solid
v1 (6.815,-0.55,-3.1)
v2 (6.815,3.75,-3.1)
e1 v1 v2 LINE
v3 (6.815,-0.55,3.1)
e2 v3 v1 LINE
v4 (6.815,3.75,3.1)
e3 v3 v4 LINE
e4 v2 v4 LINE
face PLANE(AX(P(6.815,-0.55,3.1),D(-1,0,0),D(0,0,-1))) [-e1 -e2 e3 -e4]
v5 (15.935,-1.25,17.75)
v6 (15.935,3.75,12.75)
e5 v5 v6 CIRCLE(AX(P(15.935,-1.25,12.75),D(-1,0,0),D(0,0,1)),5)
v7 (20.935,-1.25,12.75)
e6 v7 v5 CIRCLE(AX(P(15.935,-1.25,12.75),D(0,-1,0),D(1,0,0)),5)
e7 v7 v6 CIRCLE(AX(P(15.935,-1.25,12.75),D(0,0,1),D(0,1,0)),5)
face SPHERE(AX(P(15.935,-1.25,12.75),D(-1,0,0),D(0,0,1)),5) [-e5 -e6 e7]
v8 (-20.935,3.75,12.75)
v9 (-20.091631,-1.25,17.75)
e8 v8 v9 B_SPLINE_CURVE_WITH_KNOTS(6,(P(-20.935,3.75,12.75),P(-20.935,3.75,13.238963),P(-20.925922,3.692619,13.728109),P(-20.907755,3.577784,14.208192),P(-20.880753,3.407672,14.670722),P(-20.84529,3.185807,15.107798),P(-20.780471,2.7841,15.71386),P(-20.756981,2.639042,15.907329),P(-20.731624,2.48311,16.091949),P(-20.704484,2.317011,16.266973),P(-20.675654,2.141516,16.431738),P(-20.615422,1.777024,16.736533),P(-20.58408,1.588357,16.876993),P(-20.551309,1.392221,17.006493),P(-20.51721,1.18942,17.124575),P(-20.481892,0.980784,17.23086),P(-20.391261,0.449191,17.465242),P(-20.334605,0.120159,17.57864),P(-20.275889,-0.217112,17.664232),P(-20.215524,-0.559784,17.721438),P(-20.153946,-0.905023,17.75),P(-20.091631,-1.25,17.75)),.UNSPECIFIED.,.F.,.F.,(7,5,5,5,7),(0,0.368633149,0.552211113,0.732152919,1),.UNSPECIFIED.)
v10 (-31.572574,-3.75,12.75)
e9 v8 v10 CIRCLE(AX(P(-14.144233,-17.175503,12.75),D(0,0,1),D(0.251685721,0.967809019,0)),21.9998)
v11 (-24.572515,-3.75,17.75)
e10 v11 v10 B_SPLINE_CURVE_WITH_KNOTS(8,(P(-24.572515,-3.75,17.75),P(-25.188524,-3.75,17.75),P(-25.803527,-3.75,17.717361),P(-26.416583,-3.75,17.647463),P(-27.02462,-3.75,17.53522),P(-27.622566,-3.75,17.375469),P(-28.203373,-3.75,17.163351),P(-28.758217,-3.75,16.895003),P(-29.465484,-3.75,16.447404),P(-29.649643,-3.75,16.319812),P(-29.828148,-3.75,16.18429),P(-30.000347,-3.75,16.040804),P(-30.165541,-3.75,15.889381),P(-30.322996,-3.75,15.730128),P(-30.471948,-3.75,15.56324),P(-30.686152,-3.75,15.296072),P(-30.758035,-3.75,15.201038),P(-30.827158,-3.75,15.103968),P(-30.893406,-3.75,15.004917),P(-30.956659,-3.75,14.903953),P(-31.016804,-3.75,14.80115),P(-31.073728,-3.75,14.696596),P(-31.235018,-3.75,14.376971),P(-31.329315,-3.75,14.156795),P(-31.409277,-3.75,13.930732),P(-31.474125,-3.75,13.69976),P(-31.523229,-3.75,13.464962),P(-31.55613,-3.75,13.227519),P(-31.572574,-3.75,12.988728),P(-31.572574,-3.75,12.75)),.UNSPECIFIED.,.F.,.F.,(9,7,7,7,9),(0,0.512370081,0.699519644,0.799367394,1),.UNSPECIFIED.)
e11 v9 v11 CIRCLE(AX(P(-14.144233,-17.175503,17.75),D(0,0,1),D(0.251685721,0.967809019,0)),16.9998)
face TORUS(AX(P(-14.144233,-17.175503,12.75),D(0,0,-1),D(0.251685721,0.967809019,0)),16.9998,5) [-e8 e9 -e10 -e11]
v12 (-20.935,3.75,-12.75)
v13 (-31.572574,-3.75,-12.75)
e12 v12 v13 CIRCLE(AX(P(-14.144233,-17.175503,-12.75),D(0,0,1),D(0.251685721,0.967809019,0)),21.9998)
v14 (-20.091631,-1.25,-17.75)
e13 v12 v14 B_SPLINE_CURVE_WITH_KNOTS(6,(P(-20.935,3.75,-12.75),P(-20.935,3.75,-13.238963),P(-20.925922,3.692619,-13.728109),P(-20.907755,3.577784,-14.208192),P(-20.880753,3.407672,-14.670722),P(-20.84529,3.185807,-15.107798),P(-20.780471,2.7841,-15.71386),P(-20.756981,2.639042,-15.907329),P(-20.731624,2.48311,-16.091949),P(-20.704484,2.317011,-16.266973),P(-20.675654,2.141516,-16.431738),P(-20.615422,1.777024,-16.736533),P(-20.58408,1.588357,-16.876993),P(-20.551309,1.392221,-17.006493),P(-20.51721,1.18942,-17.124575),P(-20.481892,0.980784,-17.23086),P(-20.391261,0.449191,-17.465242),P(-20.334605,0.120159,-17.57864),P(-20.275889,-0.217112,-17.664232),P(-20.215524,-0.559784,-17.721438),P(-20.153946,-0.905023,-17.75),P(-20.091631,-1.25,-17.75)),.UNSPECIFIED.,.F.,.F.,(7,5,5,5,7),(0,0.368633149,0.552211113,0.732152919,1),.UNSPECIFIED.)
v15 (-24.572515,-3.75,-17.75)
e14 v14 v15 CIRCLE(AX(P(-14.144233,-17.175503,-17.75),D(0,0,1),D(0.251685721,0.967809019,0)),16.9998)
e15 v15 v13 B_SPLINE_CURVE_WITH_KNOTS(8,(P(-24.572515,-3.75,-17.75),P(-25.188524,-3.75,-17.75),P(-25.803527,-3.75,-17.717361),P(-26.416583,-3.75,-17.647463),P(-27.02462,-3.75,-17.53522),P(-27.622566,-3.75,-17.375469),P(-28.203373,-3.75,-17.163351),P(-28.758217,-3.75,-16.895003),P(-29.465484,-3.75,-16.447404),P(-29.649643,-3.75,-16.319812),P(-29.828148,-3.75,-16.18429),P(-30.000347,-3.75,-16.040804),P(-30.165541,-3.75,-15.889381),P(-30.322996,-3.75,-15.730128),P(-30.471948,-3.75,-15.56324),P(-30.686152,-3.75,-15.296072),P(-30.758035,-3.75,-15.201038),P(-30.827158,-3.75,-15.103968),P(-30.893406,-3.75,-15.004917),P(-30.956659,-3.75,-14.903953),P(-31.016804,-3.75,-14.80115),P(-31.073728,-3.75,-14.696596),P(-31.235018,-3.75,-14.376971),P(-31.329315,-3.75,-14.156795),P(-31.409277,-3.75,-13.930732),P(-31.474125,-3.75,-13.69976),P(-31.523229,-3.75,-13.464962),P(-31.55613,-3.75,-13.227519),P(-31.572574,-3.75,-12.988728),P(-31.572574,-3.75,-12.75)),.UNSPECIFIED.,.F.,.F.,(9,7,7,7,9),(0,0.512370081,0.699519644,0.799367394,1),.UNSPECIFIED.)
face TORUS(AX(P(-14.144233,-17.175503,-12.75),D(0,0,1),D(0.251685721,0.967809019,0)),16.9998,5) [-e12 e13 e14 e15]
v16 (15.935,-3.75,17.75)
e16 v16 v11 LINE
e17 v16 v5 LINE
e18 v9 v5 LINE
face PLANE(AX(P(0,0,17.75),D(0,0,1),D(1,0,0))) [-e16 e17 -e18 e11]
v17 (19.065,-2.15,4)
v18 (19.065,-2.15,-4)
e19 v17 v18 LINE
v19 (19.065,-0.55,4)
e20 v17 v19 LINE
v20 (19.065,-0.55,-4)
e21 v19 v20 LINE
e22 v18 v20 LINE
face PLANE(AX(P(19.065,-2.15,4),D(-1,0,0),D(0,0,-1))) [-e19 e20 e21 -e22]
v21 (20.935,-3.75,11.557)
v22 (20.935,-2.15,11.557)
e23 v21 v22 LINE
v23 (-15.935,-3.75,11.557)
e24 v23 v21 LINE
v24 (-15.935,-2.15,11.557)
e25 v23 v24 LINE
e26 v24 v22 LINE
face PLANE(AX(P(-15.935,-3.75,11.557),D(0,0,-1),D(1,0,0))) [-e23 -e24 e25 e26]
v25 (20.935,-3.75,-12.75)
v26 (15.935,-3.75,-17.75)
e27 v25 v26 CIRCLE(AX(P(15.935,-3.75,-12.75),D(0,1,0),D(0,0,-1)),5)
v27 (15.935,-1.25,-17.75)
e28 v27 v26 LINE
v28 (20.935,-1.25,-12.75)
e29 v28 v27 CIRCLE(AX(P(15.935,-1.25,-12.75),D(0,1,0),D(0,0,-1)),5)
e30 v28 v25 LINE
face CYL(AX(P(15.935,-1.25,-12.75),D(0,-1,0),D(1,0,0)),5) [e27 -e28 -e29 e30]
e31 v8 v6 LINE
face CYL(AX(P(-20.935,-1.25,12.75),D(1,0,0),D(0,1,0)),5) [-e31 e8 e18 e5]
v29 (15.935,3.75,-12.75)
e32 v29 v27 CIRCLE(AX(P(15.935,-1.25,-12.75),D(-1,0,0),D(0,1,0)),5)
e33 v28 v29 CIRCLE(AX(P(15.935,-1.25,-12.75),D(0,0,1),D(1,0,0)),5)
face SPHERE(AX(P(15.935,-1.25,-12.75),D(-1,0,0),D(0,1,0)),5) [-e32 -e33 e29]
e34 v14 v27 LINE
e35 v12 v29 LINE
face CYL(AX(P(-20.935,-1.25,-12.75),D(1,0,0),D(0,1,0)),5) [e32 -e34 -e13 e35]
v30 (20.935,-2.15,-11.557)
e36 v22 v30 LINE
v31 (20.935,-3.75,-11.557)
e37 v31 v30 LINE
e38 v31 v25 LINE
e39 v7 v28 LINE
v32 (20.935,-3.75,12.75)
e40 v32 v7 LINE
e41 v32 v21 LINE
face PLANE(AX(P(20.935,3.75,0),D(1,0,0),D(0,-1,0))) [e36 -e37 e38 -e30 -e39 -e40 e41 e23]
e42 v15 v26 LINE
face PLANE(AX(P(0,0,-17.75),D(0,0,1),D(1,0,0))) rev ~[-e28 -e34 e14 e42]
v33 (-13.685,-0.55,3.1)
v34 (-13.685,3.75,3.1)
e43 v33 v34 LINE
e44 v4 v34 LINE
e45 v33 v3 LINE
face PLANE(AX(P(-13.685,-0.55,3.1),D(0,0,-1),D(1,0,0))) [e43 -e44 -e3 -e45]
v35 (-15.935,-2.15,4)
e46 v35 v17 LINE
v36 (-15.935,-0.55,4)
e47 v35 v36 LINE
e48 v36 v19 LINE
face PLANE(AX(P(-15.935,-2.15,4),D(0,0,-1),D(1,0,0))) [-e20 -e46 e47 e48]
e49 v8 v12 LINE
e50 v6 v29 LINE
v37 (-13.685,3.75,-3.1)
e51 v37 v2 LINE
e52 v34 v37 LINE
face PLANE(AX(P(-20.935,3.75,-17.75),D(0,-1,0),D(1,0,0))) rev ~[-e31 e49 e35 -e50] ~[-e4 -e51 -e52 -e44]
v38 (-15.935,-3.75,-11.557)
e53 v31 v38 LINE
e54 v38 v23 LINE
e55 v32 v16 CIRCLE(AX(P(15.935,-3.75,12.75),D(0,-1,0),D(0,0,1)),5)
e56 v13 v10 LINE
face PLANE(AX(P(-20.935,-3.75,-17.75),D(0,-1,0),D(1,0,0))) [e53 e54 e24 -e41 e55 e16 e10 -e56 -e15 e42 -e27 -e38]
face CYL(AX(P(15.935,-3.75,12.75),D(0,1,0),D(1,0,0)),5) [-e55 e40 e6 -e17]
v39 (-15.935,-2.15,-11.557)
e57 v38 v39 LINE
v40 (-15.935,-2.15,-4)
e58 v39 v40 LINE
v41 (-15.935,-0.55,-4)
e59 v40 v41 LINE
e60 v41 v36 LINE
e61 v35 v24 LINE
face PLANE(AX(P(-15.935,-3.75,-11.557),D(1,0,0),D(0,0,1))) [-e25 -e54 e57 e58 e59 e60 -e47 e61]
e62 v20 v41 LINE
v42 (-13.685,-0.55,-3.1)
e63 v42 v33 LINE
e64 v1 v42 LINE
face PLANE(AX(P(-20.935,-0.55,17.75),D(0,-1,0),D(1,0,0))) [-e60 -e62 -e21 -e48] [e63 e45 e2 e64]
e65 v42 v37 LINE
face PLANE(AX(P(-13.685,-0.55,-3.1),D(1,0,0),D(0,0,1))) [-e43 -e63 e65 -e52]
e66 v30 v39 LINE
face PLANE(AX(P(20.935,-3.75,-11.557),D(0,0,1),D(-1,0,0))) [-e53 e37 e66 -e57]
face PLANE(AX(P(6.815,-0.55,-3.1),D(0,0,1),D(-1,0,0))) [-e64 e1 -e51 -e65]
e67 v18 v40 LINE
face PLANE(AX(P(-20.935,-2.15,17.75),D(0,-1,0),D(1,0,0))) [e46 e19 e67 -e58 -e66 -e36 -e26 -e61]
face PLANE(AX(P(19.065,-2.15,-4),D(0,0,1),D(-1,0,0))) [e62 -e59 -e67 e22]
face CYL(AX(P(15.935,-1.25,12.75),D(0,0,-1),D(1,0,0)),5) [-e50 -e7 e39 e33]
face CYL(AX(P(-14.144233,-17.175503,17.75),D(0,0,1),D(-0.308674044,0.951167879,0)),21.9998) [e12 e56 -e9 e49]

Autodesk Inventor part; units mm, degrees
ref_plane "YZ Plane" through (0, 0, 0) normal (1, 0, 0) x (0, 1, 0)
ref_plane "XZ Plane" through (0, 0, 0) normal (0, 1, 0) x (-1, 0, 0)
ref_plane "XY Plane" through (0, 0, 0) normal (0, 0, 1) x (1, 0, 0)
sketch "Sketch1" plane through (0, 0, 0) normal (0, 0, 1) x (1, 0, 0)
  line L0 (-20.935, 3.75) -> (20.935, 3.75)
  line L1 (20.935, 3.75) -> (20.935, -3.75)
  line L2 (20.935, -3.75) -> (-20.935, -3.75)
  line L3 (-20.935, -3.75) -> (-20.935, 3.75)
  line L4 (-20.935, 3.75) -> (20.935, -3.75) construction
  line L5 (20.935, 3.75) -> (-20.935, -3.75) construction
  point P0 (0, 0)
  dimension "d0" = 41.87
  dimension "d1" = 7.5
extrude "Extrusion1" add sketch "Sketch1" along normal mid plane 35.5
sketch "Sketch2" plane through (-20.935, -3.75, 17.75) normal (0, -1, 0) x (1, 0, 0)
  line L0 (0, -35.5) -> (0, 0) projected
  line L1 (0, -35.5) -> (0, -29.307)
  line L2 (0, -29.307) -> (5, -29.307)
  line L3 (5, -29.307) -> (5, -6.193)
  line L4 (5, -6.193) -> (41.87, -6.193)
  line L5 (41.87, -6.193) -> (41.87, -29.307)
  line L6 (41.87, -29.307) -> (5, -29.307)
  point P0 (20.935, -17.75)
  dimension "d4" = 6.193
  dimension "d5" = 5
  dimension "d6" = 23.114
  dimension "d7" = 36.87
extrude "Extrusion2" cut sketch "Sketch2" against normal blind 1.6
sketch "Sketch3" plane through (-20.935, -2.15, 17.75) normal (0, -1, 0) x (1, 0, 0)
  line L0 (5, -29.307) -> (5, -6.193) projected
  line L1 (5, -29.307) -> (5, -21.75)
  line L2 (5, -21.75) -> (5, -13.75)
  line L3 (5, -13.75) -> (40, -13.75)
  line L4 (40, -13.75) -> (40, -21.75)
  line L5 (40, -21.75) -> (5, -21.75)
  point P0 (20.935, -17.75)
  dimension "d10" = 7.557
  dimension "d11" = 8
  dimension "d12" = 35
extrude "Extrusion3" cut sketch "Sketch3" against normal blind 1.6
fillet "Fillet1" radius 5 2 edges at (0, 3.75, 17.75) (0, 3.75, -17.75)
fillet "Fillet2" radius 5 5 edges at (20.935, 2.2855, -16.2855) (20.935, -2.5, -17.75) (20.935, 2.2855, 16.2855) (20.935, -2.5, 17.75) (20.935, 3.75, 0)
sketch "Sketch5" plane through (-20.935, -0.55, 17.75) normal (0, -1, 0) x (1, 0, 0)
  line L0 (5, -29.307) -> (5, -21.75) projected
  line L1 (5, -21.75) -> (5, -20.85)
  line L2 (5, -29.307) -> (5, -6.193) projected
  line L3 (5, -20.85) -> (7.25, -20.85)
  line L4 (7.25, -20.85) -> (7.25, -14.65)
  line L5 (7.25, -14.65) -> (27.75, -14.65)
  line L6 (27.75, -14.65) -> (27.75, -20.85)
  line L7 (27.75, -20.85) -> (7.25, -20.85)
  point P0 (20.935, -17.75)
  dimension "d22" = 0.9
  dimension "d23" = 2.25
  dimension "d24" = 6.2
  dimension "d25" = 20.5
extrude "Extrusion5" cut sketch "Sketch5" against normal through all
sketch "Sketch6" plane through (-20.935, -3.75, -17.75) normal (0, -1, 0) x (1, 0, 0)
  line L0 (0, 0) -> (0, 35.5) projected
  line L1 (0, 35.5) -> (-15, 35.5)
  line L2 (-15, 35.5) -> (-15, 0)
  line L3 (-15, 0) -> (0, 0)
  line L4 (0, 0) -> (0, 35.5)
  point P0 (20.935, 17.75)
  dimension "d28" = 15
  dimension "d29" = 35.5
extrude "Extrusion6" add sketch "Sketch6" against normal blind 7.5
fillet "Fillet3" [suppressed]
sketch "Sketch7" plane through (0, 0, 17.75) normal (0, 0, 1) x (1, 0, 0)
  line L0 (-20.9589, -1.4001) -> (-20.9589, -3.75)
  line L1 (15.935, -3.75) -> (-35.935, -3.75) projected
  line L2 (-35.935, -3.75) -> (-20.9589, -3.75)
  line L3 (-20.9589, -3.75) -> (-20.9589, -14.15)
  line L4 (-20.9589, -14.15) -> (-35.935, -14.15)
  line L5 (-35.935, -14.15) -> (-35.935, -3.75)
  point P0 (0, 0)
  dimension "d33" = 10.4
extrude "Extrusion7" add sketch "Sketch7" against normal blind 35.5
sketch "Sketch8" plane through (0, 0, 17.75) normal (0, 0, 1) x (1, 0, 0)
  line L0 (-35.935, 3.75) -> (-35.935, -14.15) projected
  line L1 (-35.935, 3.75) -> (-20.935, 3.75) projected
  arc A0 (-20.935, 3.75) -> (-35.935, -14.15) centre (-14.1441, -17.1757) ccw
  line L2 (-35.935, -14.15) -> (-35.935, 3.75)
  point P0 (0, 0)
  dimension "d36" = 22
extrude "Extrusion8" cut sketch "Sketch8" against normal through all
sketch "Sketch9" plane through (0, 0, 17.75) normal (0, 0, 1) x (1, 0, 0)
  line L0 (-20.9589, -3.75) -> (-20.9589, -14.15) projected
  line L1 (-20.9589, -3.75) -> (-37.0076, -3.75)
  line L2 (-37.0076, -3.75) -> (-37.0076, -16.8891)
  line L3 (-37.0076, -16.8891) -> (-20.9589, -16.8891)
  line L4 (-20.9589, -16.8891) -> (-20.9589, -3.75)
  point P0 (0, 0)
extrude "Extrusion9" cut sketch "Sketch9" against normal through all
fillet "Fillet4" radius 5 2 edges at (-26.8211, 0.8047, 17.75) (-26.8211, 0.8047, -17.75)
properties part number "Case - Top"
